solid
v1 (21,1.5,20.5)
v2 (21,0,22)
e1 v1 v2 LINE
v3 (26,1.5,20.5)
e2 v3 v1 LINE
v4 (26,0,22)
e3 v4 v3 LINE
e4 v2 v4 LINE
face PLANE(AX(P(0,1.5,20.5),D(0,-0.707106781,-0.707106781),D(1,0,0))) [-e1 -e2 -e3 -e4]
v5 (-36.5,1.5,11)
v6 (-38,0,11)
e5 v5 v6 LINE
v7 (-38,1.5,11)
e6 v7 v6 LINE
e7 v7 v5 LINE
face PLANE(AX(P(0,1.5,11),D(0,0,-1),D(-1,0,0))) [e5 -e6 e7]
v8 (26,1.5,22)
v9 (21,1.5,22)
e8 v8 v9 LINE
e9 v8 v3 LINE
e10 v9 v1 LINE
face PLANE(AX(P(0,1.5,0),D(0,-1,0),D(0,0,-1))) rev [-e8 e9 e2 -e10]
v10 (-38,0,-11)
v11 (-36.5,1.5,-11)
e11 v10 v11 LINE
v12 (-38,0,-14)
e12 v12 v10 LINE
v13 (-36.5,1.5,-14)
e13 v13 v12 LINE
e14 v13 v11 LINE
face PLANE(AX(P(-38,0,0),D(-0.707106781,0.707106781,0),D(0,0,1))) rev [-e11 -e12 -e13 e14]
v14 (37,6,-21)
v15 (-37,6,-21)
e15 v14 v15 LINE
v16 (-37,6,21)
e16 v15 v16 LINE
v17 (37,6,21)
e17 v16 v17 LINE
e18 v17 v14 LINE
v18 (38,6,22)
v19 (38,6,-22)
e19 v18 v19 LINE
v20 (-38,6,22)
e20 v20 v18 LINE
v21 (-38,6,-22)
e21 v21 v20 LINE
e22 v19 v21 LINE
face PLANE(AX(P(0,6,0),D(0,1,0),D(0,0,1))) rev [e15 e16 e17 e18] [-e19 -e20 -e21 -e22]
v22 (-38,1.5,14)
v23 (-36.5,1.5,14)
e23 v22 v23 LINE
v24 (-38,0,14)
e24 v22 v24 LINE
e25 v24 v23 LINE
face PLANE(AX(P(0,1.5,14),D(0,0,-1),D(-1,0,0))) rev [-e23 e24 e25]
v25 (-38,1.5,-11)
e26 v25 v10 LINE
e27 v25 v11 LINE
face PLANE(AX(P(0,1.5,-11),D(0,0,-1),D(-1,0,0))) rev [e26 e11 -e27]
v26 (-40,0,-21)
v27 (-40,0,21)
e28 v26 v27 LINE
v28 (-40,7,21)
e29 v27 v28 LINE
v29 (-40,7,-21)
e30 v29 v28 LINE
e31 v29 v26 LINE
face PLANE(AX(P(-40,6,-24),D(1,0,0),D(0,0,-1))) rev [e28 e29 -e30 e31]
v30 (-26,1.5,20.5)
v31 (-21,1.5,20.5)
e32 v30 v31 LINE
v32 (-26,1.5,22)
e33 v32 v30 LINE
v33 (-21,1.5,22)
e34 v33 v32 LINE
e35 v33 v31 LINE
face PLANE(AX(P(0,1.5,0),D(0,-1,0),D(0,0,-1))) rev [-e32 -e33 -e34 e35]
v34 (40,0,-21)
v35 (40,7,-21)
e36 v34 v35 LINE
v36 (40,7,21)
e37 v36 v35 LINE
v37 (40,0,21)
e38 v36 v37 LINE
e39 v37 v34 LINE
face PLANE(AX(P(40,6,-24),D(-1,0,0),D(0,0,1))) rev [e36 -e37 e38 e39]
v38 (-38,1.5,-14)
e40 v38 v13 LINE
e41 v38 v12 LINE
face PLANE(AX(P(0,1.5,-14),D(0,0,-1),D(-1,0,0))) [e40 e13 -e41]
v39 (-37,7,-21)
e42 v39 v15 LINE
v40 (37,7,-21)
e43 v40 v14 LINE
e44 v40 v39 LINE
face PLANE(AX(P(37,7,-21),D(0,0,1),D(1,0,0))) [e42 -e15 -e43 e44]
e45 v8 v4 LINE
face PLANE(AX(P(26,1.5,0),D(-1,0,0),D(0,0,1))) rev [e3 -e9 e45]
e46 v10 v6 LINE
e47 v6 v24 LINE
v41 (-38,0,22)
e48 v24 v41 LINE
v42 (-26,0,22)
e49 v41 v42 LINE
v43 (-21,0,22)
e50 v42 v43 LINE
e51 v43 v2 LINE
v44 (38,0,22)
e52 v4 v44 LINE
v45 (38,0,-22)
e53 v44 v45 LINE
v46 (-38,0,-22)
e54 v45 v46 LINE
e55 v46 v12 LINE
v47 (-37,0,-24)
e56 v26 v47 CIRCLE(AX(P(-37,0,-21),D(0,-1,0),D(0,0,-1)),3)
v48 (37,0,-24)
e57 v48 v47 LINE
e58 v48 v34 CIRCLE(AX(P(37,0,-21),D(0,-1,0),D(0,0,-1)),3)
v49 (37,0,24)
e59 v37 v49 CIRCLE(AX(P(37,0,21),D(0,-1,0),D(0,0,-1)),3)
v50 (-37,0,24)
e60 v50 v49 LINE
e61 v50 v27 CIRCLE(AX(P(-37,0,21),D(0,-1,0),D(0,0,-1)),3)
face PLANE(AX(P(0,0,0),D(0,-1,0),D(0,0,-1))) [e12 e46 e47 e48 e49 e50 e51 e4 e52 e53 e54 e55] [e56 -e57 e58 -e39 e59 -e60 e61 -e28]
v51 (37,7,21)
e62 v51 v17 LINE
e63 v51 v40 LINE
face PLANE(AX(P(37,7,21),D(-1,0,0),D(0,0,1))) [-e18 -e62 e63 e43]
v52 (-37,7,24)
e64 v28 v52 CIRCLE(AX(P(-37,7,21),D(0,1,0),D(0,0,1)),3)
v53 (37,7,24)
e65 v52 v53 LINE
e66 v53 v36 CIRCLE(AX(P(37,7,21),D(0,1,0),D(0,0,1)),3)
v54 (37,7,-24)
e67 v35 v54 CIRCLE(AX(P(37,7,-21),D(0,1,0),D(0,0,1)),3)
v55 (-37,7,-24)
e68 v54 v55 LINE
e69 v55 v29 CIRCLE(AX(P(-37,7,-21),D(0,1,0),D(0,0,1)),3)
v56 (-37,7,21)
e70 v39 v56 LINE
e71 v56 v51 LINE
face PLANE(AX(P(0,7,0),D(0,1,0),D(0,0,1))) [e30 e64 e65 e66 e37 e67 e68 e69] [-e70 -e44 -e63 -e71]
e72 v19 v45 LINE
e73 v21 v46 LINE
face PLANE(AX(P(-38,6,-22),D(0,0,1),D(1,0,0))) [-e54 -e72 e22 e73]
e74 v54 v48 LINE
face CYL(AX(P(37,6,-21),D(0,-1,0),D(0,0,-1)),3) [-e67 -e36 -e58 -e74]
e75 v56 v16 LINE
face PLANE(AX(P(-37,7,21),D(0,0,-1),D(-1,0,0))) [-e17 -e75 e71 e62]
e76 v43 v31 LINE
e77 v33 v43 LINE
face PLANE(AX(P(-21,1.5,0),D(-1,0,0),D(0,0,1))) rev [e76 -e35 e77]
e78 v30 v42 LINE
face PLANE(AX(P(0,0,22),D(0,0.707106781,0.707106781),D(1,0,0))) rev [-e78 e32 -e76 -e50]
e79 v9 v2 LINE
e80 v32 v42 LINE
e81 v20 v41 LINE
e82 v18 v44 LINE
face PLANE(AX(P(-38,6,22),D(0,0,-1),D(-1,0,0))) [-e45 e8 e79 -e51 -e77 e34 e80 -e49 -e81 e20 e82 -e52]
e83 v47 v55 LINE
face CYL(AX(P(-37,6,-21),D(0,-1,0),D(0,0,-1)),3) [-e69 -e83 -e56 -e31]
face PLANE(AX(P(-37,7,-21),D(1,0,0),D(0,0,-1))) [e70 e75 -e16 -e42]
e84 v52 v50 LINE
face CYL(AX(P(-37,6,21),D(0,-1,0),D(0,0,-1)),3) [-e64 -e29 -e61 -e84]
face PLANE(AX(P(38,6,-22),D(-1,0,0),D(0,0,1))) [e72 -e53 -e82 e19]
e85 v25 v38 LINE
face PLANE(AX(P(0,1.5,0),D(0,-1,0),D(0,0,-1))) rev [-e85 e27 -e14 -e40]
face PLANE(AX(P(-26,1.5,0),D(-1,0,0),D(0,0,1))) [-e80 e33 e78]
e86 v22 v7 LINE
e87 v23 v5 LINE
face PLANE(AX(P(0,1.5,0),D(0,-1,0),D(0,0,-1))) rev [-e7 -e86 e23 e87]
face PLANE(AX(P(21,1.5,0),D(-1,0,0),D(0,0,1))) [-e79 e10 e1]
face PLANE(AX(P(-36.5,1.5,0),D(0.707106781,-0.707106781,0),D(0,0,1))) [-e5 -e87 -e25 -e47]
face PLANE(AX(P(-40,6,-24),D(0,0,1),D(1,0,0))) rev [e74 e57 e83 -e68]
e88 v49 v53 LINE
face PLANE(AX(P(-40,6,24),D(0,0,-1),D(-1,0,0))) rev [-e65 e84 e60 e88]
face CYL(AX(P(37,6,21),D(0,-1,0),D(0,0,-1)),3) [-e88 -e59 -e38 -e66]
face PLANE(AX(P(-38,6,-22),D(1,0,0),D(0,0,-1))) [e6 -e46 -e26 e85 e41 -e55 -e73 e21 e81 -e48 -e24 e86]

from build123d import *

# Parameters (mm, degrees)
SKETCH1_W           = 80
SKETCH1_H           = 48
SKETCH1_W_2         = 76
SKETCH1_H_2         = 44
BOSS_EXTRUDE1_DEPTH = 6
SKETCH2_W           = 80
SKETCH2_H           = 48
SKETCH2_W_2         = 74
SKETCH2_H_2         = 42
BOSS_EXTRUDE2_DEPTH = 1
FILLET1_R           = 3
SKETCH3_W           = 5
SKETCH3_H           = 1.5
SKETCH3_W_2         = 1.5
SKETCH3_H_2         = 3
BOSS_EXTRUDE3_DEPTH = 1.5
CHAMFER2_SIZE       = 1.5


with BuildPart() as part:
    # Sketch1 → Boss-Extrude1 (new body)
    with BuildSketch(Plane(origin=(0, 0, 0), x_dir=(1, 0, 0), z_dir=(0, 1, 0))):
        Rectangle(SKETCH1_W, SKETCH1_H)
        Rectangle(SKETCH1_W_2, SKETCH1_H_2, mode=Mode.SUBTRACT)
    extrude(amount=BOSS_EXTRUDE1_DEPTH)

    # Sketch2 → Boss-Extrude2 (add)
    with BuildSketch(Plane(origin=(0, 6, 0), x_dir=(1, 0, 0), z_dir=(0, 1, 0))):
        Rectangle(SKETCH2_W, SKETCH2_H)
        Rectangle(SKETCH2_W_2, SKETCH2_H_2, mode=Mode.SUBTRACT)
    extrude(amount=BOSS_EXTRUDE2_DEPTH)

    # Fillet1
    fillet1_edges = [part.edges().sort_by_distance(p)[0] for p in [
        (40, 3.5, -24),
        (40, 3.5, 24),
        (-40, 3.5, 24),
        (-40, 3.5, -24),
    ]]
    fillet(fillet1_edges, radius=FILLET1_R)

    # Sketch3 → Boss-Extrude3 (add)
    with BuildSketch(Plane.XZ):
        with Locations((-23.5, 21.25)):
            Rectangle(SKETCH3_W, SKETCH3_H)
        with Locations((-37.25, 12.5)):
            Rectangle(SKETCH3_W_2, SKETCH3_H_2)
        with Locations((23.5, 21.25)):
            Rectangle(SKETCH3_W, SKETCH3_H)
        with Locations((-37.25, -12.5)):
            Rectangle(SKETCH3_W_2, SKETCH3_H_2)
    extrude(amount=-BOSS_EXTRUDE3_DEPTH)

    # Chamfer2
    chamfer2_edges = [part.edges().sort_by_distance(p)[0] for p in [
        (23.5, 0, 20.5),
        (-23.5, 0, 20.5),
        (-36.5, 0, -12.5),
        (-36.5, 0, 12.5),
    ]]
    chamfer(chamfer2_edges, length=CHAMFER2_SIZE - 0.0001)  # a hair under: the kernel refuses the full size


solid = part.part
